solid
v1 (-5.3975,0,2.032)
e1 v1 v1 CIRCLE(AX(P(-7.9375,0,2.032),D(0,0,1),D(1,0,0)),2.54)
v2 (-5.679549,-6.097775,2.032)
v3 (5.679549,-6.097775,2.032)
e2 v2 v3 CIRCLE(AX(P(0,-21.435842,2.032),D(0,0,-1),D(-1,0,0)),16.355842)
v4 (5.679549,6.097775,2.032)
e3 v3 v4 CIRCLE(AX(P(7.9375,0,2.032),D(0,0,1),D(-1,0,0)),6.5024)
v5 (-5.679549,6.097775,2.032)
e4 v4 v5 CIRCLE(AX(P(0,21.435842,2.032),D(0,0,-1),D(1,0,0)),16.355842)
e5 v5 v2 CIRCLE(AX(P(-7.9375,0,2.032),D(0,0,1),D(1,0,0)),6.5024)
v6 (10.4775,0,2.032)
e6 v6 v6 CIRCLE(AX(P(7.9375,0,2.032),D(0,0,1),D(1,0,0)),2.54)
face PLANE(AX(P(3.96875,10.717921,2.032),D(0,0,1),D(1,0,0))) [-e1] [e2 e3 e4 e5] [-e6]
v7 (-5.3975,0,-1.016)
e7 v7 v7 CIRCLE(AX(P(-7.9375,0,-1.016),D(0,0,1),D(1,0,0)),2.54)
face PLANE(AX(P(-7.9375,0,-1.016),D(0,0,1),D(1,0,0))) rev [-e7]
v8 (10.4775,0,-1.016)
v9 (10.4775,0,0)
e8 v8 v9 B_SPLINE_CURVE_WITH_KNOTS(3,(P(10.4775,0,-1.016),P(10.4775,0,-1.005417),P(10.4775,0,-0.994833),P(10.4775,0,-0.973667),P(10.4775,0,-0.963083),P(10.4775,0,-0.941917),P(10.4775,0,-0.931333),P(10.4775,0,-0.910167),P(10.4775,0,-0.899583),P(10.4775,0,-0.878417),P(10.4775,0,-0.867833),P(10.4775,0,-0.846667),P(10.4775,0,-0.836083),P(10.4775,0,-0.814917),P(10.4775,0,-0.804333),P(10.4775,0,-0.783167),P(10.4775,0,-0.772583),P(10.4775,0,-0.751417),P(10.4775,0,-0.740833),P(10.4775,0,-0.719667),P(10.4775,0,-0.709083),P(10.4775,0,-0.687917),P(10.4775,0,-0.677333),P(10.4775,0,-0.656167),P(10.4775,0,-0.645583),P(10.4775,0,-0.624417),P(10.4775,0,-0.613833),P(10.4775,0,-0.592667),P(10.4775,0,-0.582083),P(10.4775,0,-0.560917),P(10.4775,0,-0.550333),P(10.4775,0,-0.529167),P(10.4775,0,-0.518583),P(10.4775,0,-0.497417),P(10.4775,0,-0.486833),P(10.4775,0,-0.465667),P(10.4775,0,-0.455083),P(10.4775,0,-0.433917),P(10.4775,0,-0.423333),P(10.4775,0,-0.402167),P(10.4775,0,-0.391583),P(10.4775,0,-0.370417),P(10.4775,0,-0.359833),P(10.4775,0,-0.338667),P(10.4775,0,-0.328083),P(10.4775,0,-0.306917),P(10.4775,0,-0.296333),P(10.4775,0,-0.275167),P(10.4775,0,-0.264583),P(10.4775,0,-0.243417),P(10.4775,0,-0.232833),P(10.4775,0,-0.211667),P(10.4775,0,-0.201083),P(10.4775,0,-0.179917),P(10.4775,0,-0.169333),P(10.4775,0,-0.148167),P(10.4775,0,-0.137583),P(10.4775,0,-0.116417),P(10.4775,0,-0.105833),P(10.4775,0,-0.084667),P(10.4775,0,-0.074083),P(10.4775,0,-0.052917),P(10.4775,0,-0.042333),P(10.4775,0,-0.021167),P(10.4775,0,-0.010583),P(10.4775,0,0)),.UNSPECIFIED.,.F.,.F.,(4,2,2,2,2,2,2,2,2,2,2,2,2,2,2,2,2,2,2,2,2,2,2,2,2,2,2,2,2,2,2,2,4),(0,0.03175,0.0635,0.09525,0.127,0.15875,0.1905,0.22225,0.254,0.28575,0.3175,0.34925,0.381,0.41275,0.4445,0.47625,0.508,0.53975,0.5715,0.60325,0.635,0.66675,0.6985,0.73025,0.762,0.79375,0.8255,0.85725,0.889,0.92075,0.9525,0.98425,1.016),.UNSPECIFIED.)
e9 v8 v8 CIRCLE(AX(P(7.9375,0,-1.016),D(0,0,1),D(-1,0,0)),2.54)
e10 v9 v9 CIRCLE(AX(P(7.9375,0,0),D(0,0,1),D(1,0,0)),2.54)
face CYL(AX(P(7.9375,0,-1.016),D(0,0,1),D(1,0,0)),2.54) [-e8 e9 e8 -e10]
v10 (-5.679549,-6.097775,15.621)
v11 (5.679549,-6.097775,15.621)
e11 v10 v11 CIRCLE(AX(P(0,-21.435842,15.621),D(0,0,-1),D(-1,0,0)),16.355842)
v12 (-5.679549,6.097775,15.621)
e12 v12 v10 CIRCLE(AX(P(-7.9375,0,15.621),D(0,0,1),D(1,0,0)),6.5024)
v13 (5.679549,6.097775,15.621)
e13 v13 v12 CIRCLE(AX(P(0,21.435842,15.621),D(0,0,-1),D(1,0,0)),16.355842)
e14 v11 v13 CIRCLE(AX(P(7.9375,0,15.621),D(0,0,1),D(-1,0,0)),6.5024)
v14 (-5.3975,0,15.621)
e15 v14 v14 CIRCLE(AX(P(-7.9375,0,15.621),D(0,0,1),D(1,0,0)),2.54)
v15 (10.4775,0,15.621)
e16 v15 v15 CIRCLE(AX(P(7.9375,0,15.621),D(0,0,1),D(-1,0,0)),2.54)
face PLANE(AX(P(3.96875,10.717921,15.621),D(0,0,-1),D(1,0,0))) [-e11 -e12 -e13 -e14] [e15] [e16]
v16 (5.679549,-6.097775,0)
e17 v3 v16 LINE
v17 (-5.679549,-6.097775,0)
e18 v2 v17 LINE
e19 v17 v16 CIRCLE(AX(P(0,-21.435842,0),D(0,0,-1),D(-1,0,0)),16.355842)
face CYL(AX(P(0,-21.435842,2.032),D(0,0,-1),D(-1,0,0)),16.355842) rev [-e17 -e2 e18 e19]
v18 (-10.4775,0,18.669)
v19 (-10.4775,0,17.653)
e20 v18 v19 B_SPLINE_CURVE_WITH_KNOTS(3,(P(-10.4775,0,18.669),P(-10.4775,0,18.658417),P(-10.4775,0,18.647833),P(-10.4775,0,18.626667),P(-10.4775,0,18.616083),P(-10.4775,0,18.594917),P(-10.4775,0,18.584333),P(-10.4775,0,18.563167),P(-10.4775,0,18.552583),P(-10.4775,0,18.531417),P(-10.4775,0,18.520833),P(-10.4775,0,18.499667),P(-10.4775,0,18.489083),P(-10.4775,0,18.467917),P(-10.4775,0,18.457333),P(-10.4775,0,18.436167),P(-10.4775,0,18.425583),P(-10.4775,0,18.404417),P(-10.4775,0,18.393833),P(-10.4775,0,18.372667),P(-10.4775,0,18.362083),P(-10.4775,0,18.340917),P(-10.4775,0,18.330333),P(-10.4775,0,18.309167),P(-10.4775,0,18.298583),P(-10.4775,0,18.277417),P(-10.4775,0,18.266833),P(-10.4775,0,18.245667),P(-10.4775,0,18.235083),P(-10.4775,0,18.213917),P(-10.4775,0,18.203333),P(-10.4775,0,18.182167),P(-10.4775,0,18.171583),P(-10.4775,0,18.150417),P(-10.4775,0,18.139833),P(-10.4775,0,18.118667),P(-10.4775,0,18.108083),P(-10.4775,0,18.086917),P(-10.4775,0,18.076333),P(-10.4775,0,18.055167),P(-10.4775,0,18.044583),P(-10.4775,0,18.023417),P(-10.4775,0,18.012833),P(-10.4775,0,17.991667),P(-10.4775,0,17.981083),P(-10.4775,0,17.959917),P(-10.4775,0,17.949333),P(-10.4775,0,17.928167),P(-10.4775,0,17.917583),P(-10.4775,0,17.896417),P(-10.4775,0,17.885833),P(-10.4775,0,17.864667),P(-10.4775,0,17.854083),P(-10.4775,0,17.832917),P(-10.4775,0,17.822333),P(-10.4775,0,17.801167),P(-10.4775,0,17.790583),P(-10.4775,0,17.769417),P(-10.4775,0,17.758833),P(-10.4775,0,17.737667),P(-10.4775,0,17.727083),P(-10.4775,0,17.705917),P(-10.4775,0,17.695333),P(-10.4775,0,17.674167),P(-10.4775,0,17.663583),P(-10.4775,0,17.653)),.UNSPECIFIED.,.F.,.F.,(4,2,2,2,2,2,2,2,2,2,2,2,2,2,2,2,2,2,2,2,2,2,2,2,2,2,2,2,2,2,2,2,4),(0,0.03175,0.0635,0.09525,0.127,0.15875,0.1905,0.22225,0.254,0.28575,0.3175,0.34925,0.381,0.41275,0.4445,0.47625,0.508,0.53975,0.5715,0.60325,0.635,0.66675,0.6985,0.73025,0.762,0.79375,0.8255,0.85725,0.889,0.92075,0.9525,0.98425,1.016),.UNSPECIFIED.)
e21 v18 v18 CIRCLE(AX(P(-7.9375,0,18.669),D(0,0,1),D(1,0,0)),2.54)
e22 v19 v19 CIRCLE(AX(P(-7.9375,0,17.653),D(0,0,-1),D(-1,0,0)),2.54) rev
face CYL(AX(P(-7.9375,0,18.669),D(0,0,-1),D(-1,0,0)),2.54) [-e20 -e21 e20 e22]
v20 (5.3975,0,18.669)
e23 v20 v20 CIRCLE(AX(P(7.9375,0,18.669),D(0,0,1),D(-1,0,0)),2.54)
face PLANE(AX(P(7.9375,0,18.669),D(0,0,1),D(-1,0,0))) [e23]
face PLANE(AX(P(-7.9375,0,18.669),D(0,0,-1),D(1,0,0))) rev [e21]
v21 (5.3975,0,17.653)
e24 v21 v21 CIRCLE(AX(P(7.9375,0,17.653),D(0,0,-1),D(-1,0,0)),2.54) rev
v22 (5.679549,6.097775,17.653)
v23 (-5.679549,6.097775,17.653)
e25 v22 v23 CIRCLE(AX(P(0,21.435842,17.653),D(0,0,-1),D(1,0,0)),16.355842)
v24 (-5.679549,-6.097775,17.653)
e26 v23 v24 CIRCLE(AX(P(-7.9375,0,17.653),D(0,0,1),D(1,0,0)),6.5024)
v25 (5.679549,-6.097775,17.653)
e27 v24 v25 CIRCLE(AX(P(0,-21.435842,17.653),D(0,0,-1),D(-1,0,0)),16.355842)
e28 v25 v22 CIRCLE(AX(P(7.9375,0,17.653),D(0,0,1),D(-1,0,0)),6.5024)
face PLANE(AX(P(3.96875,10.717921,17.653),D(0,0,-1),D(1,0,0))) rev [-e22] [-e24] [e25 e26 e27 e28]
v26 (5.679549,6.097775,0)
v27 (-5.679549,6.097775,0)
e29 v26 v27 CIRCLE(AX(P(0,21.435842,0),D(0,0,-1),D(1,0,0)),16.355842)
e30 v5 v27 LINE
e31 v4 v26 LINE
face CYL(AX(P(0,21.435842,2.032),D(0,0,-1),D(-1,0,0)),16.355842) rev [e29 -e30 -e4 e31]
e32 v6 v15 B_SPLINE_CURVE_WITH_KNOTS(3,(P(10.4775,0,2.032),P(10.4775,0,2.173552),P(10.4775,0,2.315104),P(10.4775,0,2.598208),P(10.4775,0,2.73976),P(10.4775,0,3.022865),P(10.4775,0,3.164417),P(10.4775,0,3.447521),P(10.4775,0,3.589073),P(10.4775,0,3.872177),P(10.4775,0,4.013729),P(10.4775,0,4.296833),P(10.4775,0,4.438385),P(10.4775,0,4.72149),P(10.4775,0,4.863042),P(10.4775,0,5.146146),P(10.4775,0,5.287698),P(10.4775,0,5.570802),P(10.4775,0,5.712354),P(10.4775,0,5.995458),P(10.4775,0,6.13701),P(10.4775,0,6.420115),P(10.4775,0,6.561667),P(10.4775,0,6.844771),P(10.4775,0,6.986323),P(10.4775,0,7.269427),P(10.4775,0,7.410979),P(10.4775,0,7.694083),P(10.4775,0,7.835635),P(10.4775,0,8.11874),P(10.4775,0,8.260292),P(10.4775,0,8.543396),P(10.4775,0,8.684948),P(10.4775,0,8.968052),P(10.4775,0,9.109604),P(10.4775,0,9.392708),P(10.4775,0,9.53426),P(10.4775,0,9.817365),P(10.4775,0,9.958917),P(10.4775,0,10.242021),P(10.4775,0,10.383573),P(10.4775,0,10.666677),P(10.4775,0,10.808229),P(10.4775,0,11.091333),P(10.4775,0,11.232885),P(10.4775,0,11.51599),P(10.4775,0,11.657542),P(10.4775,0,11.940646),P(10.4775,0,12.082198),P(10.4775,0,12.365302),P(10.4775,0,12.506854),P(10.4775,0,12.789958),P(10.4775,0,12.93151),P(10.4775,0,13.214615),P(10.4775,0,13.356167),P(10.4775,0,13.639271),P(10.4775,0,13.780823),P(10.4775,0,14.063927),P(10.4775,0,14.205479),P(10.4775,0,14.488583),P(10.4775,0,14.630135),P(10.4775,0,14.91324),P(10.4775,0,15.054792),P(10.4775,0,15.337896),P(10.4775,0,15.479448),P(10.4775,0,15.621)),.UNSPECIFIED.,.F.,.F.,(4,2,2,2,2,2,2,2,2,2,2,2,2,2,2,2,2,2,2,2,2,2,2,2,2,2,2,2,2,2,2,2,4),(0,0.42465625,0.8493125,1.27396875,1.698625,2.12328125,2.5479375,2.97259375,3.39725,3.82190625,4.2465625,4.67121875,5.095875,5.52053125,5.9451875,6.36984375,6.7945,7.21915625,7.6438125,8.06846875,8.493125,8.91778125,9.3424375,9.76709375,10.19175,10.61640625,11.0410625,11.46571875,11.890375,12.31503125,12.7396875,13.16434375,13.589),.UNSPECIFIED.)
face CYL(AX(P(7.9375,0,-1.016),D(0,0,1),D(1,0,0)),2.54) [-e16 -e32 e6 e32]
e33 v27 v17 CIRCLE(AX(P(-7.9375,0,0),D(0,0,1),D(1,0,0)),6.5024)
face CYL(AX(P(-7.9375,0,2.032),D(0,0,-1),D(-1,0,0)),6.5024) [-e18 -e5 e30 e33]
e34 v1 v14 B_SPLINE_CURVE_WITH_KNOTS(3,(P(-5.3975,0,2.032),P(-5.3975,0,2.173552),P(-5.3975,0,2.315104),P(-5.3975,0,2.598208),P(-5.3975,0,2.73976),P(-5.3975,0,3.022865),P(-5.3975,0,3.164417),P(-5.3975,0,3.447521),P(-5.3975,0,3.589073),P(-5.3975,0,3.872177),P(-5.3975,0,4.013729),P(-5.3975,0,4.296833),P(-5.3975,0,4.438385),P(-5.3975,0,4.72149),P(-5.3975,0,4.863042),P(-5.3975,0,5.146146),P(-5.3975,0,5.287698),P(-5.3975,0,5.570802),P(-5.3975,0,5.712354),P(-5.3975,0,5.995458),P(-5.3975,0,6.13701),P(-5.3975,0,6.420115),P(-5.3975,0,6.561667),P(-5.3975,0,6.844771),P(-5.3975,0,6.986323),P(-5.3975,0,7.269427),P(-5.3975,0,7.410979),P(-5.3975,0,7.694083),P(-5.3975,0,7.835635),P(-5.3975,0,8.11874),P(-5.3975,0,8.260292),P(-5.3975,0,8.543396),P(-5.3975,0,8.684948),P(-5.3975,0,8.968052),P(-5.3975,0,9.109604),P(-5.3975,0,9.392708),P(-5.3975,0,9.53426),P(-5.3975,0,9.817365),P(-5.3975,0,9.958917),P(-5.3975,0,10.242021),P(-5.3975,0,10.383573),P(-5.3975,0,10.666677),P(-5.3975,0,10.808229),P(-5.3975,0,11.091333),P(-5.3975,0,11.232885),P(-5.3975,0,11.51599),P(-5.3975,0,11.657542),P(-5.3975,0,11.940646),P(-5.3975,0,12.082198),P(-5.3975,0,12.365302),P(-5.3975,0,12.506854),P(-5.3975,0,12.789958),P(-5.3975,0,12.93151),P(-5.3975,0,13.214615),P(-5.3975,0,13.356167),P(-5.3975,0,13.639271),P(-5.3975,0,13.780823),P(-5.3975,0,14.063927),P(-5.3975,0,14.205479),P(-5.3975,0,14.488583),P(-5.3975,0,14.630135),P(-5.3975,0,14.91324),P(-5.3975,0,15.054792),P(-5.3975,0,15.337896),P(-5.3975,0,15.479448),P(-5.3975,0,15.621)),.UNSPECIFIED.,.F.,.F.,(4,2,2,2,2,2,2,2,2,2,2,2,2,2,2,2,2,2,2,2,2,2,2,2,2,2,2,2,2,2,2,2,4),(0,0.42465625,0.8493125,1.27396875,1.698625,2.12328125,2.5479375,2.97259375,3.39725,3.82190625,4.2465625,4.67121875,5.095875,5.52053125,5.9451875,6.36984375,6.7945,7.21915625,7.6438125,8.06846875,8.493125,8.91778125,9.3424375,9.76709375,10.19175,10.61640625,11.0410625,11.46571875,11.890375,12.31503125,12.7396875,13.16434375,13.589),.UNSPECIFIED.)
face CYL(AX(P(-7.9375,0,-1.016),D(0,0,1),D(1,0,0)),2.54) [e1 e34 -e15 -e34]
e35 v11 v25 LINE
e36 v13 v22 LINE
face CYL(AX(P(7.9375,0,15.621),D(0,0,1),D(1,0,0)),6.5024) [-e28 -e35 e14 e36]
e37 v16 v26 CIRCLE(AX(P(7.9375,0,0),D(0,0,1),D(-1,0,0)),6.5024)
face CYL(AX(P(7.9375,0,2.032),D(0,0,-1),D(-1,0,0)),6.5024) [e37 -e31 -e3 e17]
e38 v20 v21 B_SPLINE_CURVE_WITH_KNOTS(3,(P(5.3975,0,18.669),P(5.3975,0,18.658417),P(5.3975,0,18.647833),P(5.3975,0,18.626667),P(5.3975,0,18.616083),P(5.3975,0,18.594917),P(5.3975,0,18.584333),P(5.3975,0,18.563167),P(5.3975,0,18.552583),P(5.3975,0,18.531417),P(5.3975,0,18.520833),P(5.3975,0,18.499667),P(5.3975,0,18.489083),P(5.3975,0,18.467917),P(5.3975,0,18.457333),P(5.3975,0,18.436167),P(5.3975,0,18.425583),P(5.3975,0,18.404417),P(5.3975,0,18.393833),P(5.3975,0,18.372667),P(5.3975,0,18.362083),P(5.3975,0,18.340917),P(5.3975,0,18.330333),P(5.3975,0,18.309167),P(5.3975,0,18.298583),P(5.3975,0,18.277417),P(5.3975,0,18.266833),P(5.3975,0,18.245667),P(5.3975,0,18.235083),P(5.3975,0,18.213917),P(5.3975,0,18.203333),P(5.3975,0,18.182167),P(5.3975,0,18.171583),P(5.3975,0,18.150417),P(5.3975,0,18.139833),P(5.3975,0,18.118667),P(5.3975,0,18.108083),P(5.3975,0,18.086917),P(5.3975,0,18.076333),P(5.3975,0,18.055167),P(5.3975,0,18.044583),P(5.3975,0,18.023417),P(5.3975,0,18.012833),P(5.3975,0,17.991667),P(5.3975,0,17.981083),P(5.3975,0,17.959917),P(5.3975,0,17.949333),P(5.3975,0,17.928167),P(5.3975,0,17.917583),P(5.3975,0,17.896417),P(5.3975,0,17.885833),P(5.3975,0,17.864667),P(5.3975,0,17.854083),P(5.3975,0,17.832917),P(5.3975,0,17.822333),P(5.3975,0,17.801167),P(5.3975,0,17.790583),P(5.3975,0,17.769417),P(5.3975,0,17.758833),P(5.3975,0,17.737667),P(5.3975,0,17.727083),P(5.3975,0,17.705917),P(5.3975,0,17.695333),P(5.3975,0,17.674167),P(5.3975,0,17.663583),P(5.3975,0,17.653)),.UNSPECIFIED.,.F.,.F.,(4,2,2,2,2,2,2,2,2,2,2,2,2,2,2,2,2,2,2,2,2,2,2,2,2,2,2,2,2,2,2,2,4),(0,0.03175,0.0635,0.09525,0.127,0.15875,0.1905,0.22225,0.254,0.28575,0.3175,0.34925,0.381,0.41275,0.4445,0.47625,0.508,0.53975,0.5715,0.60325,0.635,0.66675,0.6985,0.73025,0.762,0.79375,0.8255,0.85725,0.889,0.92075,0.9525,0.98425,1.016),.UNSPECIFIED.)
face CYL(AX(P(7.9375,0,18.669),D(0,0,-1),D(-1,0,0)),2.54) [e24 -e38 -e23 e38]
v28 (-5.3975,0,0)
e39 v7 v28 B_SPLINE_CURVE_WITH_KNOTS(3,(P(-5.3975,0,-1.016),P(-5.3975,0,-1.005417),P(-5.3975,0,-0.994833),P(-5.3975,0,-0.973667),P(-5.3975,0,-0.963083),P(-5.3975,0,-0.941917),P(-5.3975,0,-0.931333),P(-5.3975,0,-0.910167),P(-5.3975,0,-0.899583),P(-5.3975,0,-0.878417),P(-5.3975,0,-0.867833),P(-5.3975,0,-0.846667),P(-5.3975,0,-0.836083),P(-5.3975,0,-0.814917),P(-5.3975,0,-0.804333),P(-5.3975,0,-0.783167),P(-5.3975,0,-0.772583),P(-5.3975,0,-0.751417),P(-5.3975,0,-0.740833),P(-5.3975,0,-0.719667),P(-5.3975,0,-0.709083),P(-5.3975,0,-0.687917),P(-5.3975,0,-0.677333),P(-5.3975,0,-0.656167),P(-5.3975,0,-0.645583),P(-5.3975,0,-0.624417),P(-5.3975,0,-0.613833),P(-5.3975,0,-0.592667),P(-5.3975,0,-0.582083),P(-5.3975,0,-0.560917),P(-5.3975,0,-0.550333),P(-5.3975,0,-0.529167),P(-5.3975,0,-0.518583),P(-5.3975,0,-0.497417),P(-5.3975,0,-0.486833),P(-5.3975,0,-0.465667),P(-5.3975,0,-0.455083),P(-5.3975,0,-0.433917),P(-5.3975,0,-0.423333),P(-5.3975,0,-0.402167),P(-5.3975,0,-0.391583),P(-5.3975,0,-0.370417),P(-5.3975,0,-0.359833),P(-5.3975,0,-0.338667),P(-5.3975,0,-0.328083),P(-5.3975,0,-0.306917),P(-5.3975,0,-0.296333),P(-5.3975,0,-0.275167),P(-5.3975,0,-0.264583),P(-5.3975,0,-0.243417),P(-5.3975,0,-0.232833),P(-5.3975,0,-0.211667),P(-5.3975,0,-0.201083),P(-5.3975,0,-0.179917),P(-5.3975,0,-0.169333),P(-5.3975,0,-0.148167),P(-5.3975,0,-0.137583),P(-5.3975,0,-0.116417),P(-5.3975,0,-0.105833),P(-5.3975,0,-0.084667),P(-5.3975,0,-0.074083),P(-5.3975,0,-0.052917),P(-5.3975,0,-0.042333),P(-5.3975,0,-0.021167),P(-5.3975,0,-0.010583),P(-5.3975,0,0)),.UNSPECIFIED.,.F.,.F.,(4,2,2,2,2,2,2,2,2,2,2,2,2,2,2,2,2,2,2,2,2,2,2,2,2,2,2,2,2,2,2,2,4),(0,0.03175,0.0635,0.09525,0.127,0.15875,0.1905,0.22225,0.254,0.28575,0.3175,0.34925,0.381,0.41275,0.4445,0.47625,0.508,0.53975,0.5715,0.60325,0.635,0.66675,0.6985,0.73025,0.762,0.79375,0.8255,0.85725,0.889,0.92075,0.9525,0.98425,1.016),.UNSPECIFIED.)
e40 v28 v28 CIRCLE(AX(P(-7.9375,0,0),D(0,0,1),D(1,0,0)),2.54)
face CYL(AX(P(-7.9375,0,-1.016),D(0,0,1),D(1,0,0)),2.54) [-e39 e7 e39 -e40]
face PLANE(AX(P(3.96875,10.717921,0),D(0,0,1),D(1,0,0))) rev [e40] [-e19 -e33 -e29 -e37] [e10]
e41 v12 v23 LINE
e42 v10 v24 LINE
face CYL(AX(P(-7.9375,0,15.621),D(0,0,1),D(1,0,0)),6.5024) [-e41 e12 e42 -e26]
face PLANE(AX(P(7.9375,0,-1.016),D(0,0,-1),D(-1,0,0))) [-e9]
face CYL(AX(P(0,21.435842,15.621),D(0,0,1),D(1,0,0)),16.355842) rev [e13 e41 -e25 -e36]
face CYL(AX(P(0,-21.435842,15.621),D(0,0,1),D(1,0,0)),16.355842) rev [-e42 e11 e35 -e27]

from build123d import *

# Parameters (mm, degrees)
BOSS_EXTRUDE1_DEPTH = 2.032
BOSS_EXTRUDE2_START = -3.048
SKETCH2_R           = 2.54
BOSS_EXTRUDE2_DEPTH = 16.637


# Read off the part's stored shape, not the designer's step: Boss-Extrude1
with BuildPart() as part:
    # Boss-Extrude1 outline → Boss-Extrude1 (new body)
    with BuildSketch(Plane.XY):
        with BuildLine():
            ThreePointArc((5.67954862, -6.097775113), (14.4399, 0), (5.67954862, 6.097775113))
            ThreePointArc((5.67954862, 6.097775113), (0, 5.08), (-5.67954862, 6.097775113))
            ThreePointArc((-5.67954862, 6.097775113), (-14.4399, 0), (-5.67954862, -6.097775113))
            ThreePointArc((-5.67954862, -6.097775113), (0, -5.08), (5.67954862, -6.097775113))
        make_face()
    boss_extrude1 = extrude(amount=BOSS_EXTRUDE1_DEPTH)

    # Sketch2 → Boss-Extrude2 (add)
    with BuildSketch(Plane.XY.offset(2.032).offset(BOSS_EXTRUDE2_START)):
        with Locations((-7.9375, 0)):
            Circle(SKETCH2_R)
        with Locations((7.9375, 0)):
            Circle(SKETCH2_R)
    boss_extrude2 = extrude(amount=BOSS_EXTRUDE2_DEPTH)

    # Mirror1: Boss-Extrude1, Boss-Extrude2 across plane
    add(boss_extrude1.mirror(Plane.XY.offset(8.8265)))
    add(boss_extrude2.mirror(Plane.XY.offset(8.8265)))


solid = part.part
